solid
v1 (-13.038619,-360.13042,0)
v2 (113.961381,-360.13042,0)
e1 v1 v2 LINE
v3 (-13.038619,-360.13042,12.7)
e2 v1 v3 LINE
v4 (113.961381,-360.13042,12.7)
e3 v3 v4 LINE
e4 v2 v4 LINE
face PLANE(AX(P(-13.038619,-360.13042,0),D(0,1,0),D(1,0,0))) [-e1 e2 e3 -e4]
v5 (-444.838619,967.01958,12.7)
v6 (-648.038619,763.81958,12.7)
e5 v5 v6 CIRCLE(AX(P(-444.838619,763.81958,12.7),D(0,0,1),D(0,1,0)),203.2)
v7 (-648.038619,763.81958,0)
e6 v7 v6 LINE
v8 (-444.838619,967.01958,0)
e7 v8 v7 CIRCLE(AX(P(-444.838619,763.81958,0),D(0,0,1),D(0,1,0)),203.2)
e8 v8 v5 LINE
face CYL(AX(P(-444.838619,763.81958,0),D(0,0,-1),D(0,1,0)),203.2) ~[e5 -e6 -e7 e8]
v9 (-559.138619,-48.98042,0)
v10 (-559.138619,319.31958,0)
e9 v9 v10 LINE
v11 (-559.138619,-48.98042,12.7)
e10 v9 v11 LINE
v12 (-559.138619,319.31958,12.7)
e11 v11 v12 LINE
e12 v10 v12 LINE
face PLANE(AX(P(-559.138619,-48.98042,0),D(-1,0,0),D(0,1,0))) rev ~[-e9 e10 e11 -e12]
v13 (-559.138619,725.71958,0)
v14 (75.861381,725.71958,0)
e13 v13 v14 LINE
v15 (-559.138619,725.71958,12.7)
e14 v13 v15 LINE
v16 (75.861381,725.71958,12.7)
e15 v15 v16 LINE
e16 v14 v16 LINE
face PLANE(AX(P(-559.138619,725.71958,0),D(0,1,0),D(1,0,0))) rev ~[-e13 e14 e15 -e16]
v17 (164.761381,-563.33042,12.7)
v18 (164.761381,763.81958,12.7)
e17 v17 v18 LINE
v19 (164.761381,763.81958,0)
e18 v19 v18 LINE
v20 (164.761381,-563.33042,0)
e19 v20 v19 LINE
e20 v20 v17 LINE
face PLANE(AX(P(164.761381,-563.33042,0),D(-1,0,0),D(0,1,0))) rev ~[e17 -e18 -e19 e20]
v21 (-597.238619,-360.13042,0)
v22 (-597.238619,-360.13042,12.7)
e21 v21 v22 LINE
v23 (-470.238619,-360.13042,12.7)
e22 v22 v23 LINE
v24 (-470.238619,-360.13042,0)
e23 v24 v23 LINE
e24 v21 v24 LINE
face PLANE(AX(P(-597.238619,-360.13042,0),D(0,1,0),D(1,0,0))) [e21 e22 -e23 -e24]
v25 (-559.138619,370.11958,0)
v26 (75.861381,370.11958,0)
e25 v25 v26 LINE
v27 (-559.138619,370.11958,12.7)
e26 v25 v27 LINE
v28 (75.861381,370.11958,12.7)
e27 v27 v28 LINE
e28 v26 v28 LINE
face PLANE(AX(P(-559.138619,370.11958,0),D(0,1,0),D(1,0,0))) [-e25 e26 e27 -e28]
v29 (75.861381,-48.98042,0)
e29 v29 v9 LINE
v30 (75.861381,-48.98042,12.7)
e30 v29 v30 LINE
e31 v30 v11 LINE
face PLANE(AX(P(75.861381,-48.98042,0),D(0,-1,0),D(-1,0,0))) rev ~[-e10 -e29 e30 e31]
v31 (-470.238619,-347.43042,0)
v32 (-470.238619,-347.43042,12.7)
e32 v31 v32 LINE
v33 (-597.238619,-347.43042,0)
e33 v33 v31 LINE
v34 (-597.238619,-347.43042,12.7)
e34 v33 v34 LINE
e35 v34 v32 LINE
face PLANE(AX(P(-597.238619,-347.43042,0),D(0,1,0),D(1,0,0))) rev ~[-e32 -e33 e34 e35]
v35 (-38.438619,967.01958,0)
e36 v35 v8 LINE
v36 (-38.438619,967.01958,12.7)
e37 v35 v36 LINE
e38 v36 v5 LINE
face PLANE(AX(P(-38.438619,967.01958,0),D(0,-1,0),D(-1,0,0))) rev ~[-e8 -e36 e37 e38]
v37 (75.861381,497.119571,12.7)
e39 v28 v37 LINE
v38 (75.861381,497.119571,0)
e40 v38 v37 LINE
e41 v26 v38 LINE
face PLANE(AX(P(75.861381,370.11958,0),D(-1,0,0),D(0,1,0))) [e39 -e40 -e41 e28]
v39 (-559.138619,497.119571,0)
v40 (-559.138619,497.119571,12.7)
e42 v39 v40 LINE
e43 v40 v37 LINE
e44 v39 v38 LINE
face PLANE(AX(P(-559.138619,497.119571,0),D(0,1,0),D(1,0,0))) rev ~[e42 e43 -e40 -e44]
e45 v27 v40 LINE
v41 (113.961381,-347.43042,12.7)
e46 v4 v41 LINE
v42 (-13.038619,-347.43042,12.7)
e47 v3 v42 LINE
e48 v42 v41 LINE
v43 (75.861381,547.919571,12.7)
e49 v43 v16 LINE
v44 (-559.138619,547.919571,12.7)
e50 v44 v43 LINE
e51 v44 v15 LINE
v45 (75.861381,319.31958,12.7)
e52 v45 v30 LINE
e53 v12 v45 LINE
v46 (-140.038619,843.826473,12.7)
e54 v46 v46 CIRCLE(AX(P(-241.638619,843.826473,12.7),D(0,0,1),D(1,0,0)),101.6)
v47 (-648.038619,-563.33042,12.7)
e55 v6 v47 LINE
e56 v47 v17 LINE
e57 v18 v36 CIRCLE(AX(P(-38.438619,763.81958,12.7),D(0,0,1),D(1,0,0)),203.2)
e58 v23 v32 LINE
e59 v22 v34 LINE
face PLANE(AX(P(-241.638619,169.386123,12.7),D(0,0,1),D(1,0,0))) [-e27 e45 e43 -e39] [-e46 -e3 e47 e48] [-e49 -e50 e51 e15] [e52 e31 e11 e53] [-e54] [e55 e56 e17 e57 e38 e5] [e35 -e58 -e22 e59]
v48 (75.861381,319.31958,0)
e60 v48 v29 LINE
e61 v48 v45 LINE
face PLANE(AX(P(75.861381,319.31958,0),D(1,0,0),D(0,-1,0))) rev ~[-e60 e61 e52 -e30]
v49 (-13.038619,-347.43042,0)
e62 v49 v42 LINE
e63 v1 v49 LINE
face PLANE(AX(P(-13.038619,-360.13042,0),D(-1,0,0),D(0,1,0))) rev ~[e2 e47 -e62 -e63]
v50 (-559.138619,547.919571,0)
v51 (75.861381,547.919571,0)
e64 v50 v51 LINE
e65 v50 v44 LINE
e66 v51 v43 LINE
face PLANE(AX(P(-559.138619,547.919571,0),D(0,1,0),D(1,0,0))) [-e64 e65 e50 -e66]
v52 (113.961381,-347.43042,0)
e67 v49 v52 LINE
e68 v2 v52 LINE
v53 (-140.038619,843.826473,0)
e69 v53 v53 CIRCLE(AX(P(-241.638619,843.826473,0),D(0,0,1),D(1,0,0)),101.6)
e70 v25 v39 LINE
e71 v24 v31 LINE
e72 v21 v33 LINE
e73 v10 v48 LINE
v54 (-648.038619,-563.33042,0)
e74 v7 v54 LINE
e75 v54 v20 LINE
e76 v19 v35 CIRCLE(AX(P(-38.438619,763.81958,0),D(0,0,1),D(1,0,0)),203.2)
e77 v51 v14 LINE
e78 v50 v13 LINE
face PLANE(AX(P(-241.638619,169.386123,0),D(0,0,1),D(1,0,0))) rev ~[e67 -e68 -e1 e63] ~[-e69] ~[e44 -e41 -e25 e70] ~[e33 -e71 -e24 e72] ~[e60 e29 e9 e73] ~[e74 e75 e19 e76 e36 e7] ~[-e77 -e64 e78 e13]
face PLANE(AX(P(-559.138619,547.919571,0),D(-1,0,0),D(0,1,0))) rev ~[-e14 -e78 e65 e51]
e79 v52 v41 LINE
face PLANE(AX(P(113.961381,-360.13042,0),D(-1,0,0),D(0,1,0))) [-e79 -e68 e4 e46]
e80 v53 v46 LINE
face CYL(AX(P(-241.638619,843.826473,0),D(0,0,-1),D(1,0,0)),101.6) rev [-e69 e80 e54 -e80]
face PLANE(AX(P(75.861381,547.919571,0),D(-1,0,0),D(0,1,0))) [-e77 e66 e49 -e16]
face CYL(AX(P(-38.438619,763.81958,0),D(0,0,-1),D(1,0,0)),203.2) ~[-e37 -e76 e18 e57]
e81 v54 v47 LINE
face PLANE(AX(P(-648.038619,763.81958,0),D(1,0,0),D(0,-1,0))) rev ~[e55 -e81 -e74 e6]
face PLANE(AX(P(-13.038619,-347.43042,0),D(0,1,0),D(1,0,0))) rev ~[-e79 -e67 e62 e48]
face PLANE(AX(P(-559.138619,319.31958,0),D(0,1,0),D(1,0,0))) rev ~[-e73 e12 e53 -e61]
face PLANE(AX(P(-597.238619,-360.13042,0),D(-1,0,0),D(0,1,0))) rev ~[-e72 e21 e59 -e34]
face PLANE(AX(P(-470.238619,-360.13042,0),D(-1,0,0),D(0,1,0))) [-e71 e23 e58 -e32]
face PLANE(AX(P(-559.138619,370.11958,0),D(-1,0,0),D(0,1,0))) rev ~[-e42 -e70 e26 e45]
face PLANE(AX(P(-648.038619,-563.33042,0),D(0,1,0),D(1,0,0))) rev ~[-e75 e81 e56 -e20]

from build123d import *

# Parameters (mm, degrees)
F0_W     = 127
F0_H     = 12.7
F0_W_2   = 635
F0_H_2   = 126.9999911487
F0_R     = 101.6
F0_H_3   = 177.8000088513
F1_DEPTH = 12.7


# Not quite as in the source:
# - a feature names something its author has since deleted; it is built from what else it names


with BuildPart() as f1:
    # F0 (on Top) → F1 (new body)
    with BuildSketch(Plane.XY):
        with BuildLine():
            ThreePointArc((-444.8386187891, 967.019580251), (-588.5227167262, 907.5036781881), (-648.0386187891, 763.819580251))
            Line((-648.0386187891, 763.819580251), (-648.0386187891, -556.980419749))
            Line((-648.0386187891, -556.980419749), (-648.0386187891, -563.330419749))
            Line((-648.0386187891, -563.330419749), (164.7613812109, -563.330419749))
            Line((164.7613812109, -563.330419749), (164.7613812109, -556.980419749))
            Line((164.7613812109, -556.980419749), (164.7613812109, 763.819580251))
            ThreePointArc((164.7613812109, 763.819580251), (105.245479148, 907.5036781881), (-38.4386187891, 967.019580251))
            Line((-38.4386187891, 967.019580251), (-444.8386187891, 967.019580251))
        make_face()
        with Locations((-533.7386187891, -353.780419749)):
            Rectangle(F0_W, F0_H, mode=Mode.SUBTRACT)
        with Locations((50.4613812109, -353.780419749)):
            Rectangle(F0_W, F0_H, mode=Mode.SUBTRACT)
        Polygon((75.8613812109, -48.980419749), (-559.1386187891, -48.980419749), (-559.1386187891, 90.719580251), (-559.1386187891, 141.519580251), (-559.1386187891, 319.319580251), (75.8613812109, 319.319580251), (75.8613812109, 141.519580251), (75.8613812109, 90.719580251), align=None, mode=Mode.SUBTRACT)
        with Locations((-241.6386187891, 433.6195758253)):
            Rectangle(F0_W_2, F0_H_2, mode=Mode.SUBTRACT)
        with Locations((-241.6386187891, 843.8264727592)):
            Circle(F0_R, mode=Mode.SUBTRACT)
        with Locations((-241.6386187891, 636.8195758253)):
            Rectangle(F0_W_2, F0_H_3, mode=Mode.SUBTRACT)
    extrude(amount=F1_DEPTH)


solid = f1.part
